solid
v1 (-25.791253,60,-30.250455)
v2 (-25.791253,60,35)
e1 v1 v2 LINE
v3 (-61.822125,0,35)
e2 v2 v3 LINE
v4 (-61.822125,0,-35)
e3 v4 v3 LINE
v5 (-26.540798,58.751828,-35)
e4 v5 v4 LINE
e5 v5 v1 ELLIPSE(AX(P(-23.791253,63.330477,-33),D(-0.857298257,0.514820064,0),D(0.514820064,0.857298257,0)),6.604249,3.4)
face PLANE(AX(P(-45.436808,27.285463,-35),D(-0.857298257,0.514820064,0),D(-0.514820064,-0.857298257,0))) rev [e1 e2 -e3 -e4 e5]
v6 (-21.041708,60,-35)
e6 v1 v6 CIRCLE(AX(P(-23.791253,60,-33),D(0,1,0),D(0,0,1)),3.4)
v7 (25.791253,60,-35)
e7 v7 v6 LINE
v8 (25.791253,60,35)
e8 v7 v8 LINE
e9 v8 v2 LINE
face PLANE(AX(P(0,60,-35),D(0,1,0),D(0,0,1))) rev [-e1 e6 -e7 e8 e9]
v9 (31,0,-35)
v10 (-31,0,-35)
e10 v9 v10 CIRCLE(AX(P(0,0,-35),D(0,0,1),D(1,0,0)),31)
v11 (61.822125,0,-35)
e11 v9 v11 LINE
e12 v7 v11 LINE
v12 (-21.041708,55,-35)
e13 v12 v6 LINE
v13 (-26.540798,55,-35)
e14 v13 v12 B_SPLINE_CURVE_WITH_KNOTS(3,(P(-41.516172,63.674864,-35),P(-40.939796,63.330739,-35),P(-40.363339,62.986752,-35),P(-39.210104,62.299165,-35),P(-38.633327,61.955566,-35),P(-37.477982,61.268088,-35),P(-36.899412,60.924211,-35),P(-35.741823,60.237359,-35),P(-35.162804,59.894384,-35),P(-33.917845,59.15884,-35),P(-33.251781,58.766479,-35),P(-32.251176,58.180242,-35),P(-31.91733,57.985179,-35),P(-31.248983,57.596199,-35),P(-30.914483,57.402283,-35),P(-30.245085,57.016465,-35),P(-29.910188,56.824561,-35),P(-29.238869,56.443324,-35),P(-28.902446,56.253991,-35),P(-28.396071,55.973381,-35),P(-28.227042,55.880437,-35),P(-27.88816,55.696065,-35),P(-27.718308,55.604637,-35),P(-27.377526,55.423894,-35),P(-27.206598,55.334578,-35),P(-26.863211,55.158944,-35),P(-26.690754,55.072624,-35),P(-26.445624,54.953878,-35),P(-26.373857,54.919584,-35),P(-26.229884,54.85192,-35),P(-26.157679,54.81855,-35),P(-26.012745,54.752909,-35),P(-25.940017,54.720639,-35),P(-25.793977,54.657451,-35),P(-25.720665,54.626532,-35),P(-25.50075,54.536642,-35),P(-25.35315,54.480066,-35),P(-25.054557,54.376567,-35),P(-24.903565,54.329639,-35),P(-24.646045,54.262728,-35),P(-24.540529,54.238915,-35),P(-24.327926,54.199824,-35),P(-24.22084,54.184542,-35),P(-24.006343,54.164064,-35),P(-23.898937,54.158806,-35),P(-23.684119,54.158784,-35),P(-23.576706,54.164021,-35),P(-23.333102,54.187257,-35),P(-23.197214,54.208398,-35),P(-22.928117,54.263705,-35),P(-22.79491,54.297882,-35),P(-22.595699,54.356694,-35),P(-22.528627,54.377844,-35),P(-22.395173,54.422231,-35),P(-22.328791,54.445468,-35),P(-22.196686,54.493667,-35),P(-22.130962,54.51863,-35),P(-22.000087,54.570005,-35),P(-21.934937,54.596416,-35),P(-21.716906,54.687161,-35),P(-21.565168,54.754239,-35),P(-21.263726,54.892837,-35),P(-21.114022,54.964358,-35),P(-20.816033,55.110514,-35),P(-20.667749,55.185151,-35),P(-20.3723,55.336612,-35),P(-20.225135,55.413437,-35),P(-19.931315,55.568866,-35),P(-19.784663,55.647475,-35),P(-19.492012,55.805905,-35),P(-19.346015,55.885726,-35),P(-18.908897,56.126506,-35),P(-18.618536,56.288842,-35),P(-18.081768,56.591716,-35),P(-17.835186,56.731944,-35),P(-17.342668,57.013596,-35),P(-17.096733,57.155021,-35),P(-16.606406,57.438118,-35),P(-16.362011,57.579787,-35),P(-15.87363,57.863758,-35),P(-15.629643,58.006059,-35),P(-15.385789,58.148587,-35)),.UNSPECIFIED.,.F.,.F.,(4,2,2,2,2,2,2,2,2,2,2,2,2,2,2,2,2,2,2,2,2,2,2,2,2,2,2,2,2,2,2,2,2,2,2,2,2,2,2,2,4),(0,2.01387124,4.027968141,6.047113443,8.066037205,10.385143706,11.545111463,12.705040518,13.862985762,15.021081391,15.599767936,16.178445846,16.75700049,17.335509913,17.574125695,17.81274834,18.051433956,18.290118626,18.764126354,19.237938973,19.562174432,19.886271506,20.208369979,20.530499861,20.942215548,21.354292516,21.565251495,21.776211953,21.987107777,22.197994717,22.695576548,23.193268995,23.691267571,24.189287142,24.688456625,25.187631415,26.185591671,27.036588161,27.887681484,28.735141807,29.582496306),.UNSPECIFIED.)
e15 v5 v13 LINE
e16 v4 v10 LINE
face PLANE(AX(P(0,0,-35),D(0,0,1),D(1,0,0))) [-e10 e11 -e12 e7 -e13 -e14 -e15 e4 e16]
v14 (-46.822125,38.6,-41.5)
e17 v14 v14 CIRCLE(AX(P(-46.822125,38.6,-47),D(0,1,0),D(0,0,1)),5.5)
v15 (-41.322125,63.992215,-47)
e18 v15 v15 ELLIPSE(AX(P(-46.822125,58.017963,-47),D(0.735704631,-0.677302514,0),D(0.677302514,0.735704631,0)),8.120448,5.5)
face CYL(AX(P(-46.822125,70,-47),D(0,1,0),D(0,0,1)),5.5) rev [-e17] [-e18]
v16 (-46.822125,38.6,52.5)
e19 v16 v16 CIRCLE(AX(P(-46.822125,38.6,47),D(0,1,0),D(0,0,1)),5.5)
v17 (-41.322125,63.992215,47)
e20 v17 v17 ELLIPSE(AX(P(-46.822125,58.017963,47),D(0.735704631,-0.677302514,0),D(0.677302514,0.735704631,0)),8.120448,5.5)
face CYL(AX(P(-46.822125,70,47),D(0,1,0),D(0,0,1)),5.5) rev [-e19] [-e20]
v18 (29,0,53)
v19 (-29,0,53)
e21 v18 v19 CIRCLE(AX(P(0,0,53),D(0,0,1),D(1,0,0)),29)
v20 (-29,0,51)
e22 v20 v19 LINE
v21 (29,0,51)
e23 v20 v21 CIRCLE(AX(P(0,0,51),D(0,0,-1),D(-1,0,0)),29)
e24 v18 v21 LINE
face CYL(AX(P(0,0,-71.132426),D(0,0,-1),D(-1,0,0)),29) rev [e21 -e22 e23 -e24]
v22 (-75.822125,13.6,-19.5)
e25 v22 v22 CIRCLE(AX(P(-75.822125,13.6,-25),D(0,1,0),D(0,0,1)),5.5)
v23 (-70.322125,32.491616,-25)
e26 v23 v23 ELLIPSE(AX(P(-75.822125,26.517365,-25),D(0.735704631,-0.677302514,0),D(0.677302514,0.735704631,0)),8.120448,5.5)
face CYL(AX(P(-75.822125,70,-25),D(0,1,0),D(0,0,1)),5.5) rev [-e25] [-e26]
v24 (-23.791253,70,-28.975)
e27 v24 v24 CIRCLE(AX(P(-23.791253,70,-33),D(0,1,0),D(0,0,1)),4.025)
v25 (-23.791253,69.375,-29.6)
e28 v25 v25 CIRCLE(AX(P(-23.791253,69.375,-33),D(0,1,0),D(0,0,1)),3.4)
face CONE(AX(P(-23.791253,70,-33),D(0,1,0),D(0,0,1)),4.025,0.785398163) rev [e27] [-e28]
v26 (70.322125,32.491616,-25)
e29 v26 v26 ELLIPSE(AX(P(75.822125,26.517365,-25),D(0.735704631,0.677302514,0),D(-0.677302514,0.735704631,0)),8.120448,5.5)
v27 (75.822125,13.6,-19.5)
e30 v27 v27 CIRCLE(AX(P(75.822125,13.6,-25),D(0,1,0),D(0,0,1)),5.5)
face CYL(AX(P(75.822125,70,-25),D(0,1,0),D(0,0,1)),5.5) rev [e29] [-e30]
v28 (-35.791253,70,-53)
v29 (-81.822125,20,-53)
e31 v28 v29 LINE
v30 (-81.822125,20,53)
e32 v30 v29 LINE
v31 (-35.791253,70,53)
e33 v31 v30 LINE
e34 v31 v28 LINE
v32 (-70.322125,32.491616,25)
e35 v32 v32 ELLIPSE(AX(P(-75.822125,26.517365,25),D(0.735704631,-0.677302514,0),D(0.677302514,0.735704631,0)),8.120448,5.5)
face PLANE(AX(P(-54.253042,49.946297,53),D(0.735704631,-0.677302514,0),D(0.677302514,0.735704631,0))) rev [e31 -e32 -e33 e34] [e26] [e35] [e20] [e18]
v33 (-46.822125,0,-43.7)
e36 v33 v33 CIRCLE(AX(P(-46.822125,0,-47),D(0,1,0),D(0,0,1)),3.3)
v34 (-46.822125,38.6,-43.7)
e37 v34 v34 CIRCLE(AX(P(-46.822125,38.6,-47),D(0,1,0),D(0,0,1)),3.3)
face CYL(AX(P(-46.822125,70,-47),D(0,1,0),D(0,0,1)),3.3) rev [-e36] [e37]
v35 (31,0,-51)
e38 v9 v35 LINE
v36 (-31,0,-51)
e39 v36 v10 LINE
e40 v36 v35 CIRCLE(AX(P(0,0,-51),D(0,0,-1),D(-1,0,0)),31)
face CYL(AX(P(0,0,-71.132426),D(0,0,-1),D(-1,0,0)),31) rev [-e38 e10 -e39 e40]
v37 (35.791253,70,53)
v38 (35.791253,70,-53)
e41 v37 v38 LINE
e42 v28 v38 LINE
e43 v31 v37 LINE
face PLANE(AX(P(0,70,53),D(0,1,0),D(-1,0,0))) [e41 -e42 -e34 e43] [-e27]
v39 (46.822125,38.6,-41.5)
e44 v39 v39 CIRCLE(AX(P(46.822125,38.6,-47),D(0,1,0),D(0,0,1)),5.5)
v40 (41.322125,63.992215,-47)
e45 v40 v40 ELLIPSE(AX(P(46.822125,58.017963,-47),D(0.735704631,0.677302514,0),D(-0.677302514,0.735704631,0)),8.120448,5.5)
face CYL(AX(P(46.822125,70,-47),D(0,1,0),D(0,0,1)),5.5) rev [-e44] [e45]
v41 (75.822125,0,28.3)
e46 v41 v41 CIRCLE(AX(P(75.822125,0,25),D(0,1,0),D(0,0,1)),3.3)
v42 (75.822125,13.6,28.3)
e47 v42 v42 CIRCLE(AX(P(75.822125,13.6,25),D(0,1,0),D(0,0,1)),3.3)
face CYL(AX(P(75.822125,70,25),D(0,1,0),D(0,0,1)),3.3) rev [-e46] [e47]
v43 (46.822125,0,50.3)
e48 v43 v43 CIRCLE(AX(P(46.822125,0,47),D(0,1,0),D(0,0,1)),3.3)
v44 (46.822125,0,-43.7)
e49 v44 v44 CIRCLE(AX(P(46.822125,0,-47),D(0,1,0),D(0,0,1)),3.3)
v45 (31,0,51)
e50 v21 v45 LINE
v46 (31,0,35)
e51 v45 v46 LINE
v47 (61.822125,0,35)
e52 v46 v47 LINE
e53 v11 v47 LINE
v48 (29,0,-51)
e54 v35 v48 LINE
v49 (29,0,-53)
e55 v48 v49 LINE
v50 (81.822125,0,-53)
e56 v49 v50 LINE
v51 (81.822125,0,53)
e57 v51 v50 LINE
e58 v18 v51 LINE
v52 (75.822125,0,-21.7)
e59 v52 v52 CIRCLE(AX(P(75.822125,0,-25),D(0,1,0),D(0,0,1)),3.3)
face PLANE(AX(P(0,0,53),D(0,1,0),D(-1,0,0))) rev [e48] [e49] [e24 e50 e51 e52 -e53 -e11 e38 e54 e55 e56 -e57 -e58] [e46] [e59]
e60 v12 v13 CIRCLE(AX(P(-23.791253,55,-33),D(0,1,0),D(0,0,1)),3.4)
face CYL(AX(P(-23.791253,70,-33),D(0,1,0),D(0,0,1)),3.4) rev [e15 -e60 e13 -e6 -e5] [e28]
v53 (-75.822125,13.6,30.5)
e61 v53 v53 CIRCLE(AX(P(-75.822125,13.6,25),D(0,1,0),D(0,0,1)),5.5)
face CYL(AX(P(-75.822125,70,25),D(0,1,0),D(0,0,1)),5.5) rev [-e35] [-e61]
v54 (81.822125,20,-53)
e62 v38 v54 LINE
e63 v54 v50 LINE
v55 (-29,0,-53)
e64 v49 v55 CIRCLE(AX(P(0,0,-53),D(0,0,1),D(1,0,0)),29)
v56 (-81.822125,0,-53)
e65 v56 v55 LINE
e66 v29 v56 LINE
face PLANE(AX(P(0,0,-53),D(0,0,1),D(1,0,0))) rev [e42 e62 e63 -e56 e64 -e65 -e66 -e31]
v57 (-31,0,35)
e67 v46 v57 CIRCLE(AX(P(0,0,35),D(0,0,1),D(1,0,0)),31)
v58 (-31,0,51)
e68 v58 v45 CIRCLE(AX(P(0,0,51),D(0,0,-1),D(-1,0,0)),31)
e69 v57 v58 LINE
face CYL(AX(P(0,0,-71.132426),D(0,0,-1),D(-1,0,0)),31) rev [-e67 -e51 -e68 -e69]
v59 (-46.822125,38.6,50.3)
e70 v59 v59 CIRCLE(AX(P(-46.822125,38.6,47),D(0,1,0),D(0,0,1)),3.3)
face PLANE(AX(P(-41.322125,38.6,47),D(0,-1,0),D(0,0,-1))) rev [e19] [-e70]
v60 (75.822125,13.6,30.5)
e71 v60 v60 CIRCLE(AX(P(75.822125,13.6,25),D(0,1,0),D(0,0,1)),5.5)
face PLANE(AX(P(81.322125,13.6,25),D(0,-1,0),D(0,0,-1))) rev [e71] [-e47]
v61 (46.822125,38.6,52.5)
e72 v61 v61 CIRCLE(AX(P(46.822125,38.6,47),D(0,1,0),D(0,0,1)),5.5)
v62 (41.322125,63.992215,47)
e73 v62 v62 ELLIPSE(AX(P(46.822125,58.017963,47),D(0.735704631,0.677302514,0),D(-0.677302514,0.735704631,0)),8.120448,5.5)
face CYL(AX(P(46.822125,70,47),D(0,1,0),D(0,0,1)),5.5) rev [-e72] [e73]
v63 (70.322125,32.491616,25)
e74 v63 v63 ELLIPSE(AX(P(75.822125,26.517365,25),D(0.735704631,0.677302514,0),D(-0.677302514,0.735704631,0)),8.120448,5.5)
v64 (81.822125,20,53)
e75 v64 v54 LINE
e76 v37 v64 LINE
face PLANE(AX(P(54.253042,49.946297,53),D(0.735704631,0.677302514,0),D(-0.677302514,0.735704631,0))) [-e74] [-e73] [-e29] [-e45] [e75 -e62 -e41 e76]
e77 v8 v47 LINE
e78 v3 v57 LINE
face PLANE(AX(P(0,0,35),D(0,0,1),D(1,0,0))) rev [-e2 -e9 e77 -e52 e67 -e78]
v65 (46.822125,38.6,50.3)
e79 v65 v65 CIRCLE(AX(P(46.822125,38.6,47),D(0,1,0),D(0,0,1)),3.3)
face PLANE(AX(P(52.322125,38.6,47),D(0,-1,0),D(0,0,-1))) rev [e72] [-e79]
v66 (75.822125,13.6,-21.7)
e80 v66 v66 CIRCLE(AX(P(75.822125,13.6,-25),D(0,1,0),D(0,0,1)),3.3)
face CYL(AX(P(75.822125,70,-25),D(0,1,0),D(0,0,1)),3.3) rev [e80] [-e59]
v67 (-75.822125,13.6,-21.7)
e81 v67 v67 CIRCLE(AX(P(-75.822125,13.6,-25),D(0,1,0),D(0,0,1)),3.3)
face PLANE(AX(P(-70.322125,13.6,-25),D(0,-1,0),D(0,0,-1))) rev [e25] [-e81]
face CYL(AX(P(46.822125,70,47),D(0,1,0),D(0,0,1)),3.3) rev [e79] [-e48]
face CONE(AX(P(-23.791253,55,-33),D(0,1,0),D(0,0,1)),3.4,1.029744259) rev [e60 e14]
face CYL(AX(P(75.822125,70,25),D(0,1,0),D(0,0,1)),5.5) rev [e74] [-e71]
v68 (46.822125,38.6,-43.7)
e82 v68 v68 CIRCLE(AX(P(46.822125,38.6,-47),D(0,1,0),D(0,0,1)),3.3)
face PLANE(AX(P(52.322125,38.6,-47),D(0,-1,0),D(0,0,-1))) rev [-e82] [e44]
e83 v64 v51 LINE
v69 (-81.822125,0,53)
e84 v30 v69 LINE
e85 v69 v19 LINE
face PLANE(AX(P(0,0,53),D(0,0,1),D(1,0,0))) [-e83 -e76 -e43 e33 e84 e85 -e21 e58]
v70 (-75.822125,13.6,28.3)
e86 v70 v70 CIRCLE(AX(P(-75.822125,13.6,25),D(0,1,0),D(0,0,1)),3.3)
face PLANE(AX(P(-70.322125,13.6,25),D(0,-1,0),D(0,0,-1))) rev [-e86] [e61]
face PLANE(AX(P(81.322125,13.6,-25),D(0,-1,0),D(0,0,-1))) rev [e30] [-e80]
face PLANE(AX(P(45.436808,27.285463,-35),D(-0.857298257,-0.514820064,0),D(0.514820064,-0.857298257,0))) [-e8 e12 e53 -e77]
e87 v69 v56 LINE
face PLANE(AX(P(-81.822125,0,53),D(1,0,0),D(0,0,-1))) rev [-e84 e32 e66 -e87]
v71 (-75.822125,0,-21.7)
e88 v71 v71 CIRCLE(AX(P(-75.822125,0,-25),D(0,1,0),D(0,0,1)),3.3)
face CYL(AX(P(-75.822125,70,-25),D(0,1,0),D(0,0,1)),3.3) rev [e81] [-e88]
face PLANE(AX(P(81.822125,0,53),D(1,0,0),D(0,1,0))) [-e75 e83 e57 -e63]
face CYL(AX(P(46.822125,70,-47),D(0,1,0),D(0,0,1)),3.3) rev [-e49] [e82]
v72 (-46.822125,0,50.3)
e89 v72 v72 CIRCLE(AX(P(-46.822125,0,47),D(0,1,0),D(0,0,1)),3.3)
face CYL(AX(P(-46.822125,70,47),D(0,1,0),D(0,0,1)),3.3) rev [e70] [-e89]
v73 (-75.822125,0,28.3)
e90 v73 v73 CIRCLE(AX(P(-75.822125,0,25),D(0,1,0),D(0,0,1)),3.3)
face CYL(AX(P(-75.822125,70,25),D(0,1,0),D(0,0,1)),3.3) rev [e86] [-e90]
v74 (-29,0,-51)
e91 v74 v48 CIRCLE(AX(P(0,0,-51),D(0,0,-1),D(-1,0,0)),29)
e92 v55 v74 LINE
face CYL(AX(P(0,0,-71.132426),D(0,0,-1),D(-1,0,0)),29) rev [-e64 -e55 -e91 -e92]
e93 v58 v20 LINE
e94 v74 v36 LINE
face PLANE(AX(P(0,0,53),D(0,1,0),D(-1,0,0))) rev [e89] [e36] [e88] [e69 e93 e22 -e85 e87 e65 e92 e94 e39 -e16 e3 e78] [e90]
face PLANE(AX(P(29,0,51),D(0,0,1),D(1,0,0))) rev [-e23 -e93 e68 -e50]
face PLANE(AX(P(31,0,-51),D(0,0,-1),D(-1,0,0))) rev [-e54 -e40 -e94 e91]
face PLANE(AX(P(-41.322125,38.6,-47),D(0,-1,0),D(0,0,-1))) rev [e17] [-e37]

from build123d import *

# Parameters (mm, degrees)
P_IDAT_VYSUNUT_M1_DEPTH                     = 53
ODEBRAT_VYSUNUT_M1_DEPTH                    = 35
V_LCOV_START                                = 38.6
V_LCOV_ZAHLOUBEN_PRO_M6_ROUBY_S_V_2_R       = 5.5
V_LCOV_ZAHLOUBEN_PRO_M6_ROUBY_S_VNIT_DEPTH  = 25.392214676
V_LCOV_ZAHLOUBEN_PRO_M6_ROUBY_S_V_3_O_R     = 3.3
V_LCOV_ZAHLOUBEN_PRO_M6_ROUBY_S_V_3_DEPTH   = 38.6
V_LCOV_START_2                              = 13.6
V_LCOV_ZAHLOUBEN_PRO_M6_ROUBY_S_V_4_O_R     = 5.5
V_LCOV_ZAHLOUBEN_PRO_M6_ROUBY_S_V_4_DEPTH   = 18.891616585
V_LCOV_ZAHLOUBEN_PRO_M6_ROUBY_S_V_5_R       = 3.3
V_LCOV_ZAHLOUBEN_PRO_M6_ROUBY_S_V_4_2_DEPTH = 13.6
M8_Z_VIT1_D                                 = 6.8
M8_Z_VIT1_DEPTH                             = 15
M8_Z_VIT1_CSINK_D                           = 8.05
M8_Z_VIT1_CSINK_ANGLE                       = 90
M8_Z_VIT1_TIP                               = 2.042926105


# Read off the part's stored shape, not the designer's step: Válcové zahloubení pro M6 šrouby s vnitřním šestihranem1, Válcové zahloubení pro M6 šrouby s vnitřním šestihranem2
with BuildPart() as part:
    # Skica1 → Přidat vysunutím1 (new, symmetric)
    with BuildSketch(Plane.XY):
        Polygon((61.822124963, 0), (25.791252921, 60), (-25.791252921, 60), (-61.822124963, 0), align=None)
        Polygon((-25.791252921, 60), (25.791252921, 60), (61.822124963, 0), (81.822124963, 0), (81.822124963, 20), (35.791252921, 70), (-35.791252921, 70), (-81.822124963, 20), (-81.822124963, 0), (-61.822124963, 0), align=None)
    extrude(amount=P_IDAT_VYSUNUT_M1_DEPTH, both=True)

    # Skica1<3> → Odebrat vysunutím1 (cut, symmetric)
    with BuildSketch(Plane.XY):
        Polygon((61.822124963, 0), (25.791252921, 60), (-25.791252921, 60), (-61.822124963, 0), align=None)
    extrude(amount=ODEBRAT_VYSUNUT_M1_DEPTH, both=True, mode=Mode.SUBTRACT)

    # V_lcov_ zahlouben_ pro M6 _rouby s v 2 → V_lcov_ zahlouben_ pro M6 _rouby s vnit (cut)
    with BuildSketch(Plane(origin=(0, 0, 0), x_dir=(1, 0, 0), z_dir=(0, 1, 0)).offset(V_LCOV_START)):
        with Locations((46.822124963, 47)):
            Circle(V_LCOV_ZAHLOUBEN_PRO_M6_ROUBY_S_V_2_R)
        with Locations((-46.822124963, -47)):
            Circle(V_LCOV_ZAHLOUBEN_PRO_M6_ROUBY_S_V_2_R)
        with Locations((46.822124963, -47)):
            Circle(V_LCOV_ZAHLOUBEN_PRO_M6_ROUBY_S_V_2_R)
        with Locations((-46.822124963, 47)):
            Circle(V_LCOV_ZAHLOUBEN_PRO_M6_ROUBY_S_V_2_R)
    extrude(amount=V_LCOV_ZAHLOUBEN_PRO_M6_ROUBY_S_VNIT_DEPTH, mode=Mode.SUBTRACT)

    # V_lcov_ zahlouben_ pro M6 _rouby s v 3 o → V_lcov_ zahlouben_ pro M6 _rouby s v 3 (cut)
    with BuildSketch(Plane(origin=(0, 0, 0), x_dir=(1, 0, 0), z_dir=(0, 1, 0))):
        with Locations((46.822124963, 47)):
            Circle(V_LCOV_ZAHLOUBEN_PRO_M6_ROUBY_S_V_3_O_R)
        with Locations((-46.822124963, -47)):
            Circle(V_LCOV_ZAHLOUBEN_PRO_M6_ROUBY_S_V_3_O_R)
        with Locations((46.822124963, -47)):
            Circle(V_LCOV_ZAHLOUBEN_PRO_M6_ROUBY_S_V_3_O_R)
        with Locations((-46.822124963, 47)):
            Circle(V_LCOV_ZAHLOUBEN_PRO_M6_ROUBY_S_V_3_O_R)
    extrude(amount=V_LCOV_ZAHLOUBEN_PRO_M6_ROUBY_S_V_3_DEPTH, mode=Mode.SUBTRACT)

    # V_lcov_ zahlouben_ pro M6 _rouby s v 4 o → V_lcov_ zahlouben_ pro M6 _rouby s v 4 (cut)
    with BuildSketch(Plane(origin=(0, 0, 0), x_dir=(1, 0, 0), z_dir=(0, 1, 0)).offset(V_LCOV_START_2)):
        with Locations((75.822124963, 25)):
            Circle(V_LCOV_ZAHLOUBEN_PRO_M6_ROUBY_S_V_4_O_R)
        with Locations((-75.822124963, -25)):
            Circle(V_LCOV_ZAHLOUBEN_PRO_M6_ROUBY_S_V_4_O_R)
        with Locations((75.822124963, -25)):
            Circle(V_LCOV_ZAHLOUBEN_PRO_M6_ROUBY_S_V_4_O_R)
        with Locations((-75.822124963, 25)):
            Circle(V_LCOV_ZAHLOUBEN_PRO_M6_ROUBY_S_V_4_O_R)
    extrude(amount=V_LCOV_ZAHLOUBEN_PRO_M6_ROUBY_S_V_4_DEPTH, mode=Mode.SUBTRACT)

    # V_lcov_ zahlouben_ pro M6 _rouby s v 5 → V_lcov_ zahlouben_ pro M6 _rouby s v 4 2 (cut)
    with BuildSketch(Plane(origin=(0, 0, 0), x_dir=(1, 0, 0), z_dir=(0, 1, 0))):
        with Locations((75.822124963, 25)):
            Circle(V_LCOV_ZAHLOUBEN_PRO_M6_ROUBY_S_V_5_R)
        with Locations((-75.822124963, -25)):
            Circle(V_LCOV_ZAHLOUBEN_PRO_M6_ROUBY_S_V_5_R)
        with Locations((75.822124963, -25)):
            Circle(V_LCOV_ZAHLOUBEN_PRO_M6_ROUBY_S_V_5_R)
        with Locations((-75.822124963, 25)):
            Circle(V_LCOV_ZAHLOUBEN_PRO_M6_ROUBY_S_V_5_R)
    extrude(amount=V_LCOV_ZAHLOUBEN_PRO_M6_ROUBY_S_V_4_2_DEPTH, mode=Mode.SUBTRACT)

    # M8 závit1
    with Locations(Plane(origin=(0, 70, 0), x_dir=(1, 0, 0), z_dir=(0, 1, 0))):
        with Locations((-23.791252921, 33)):
            CounterSinkHole(M8_Z_VIT1_D / 2, M8_Z_VIT1_CSINK_D / 2, depth=M8_Z_VIT1_DEPTH, counter_sink_angle=M8_Z_VIT1_CSINK_ANGLE)
            with Locations((0, 0, -(M8_Z_VIT1_DEPTH + M8_Z_VIT1_TIP / 2))):  # 118° drill point
                Cone(0, M8_Z_VIT1_D / 2, M8_Z_VIT1_TIP, mode=Mode.SUBTRACT)

    # Skica12 → Odebrat rotací1 (revolve, cut)
    with BuildSketch(Plane.XZ):
        Polygon((0, 61), (29, 61), (29, 51), (31, 51), (31, -51), (29, -51), (29, -61), (0, -61), align=None)
    revolve(axis=Axis((0, 0, -71.132425853), (0, 0, 1)), mode=Mode.SUBTRACT)


solid = part.part
